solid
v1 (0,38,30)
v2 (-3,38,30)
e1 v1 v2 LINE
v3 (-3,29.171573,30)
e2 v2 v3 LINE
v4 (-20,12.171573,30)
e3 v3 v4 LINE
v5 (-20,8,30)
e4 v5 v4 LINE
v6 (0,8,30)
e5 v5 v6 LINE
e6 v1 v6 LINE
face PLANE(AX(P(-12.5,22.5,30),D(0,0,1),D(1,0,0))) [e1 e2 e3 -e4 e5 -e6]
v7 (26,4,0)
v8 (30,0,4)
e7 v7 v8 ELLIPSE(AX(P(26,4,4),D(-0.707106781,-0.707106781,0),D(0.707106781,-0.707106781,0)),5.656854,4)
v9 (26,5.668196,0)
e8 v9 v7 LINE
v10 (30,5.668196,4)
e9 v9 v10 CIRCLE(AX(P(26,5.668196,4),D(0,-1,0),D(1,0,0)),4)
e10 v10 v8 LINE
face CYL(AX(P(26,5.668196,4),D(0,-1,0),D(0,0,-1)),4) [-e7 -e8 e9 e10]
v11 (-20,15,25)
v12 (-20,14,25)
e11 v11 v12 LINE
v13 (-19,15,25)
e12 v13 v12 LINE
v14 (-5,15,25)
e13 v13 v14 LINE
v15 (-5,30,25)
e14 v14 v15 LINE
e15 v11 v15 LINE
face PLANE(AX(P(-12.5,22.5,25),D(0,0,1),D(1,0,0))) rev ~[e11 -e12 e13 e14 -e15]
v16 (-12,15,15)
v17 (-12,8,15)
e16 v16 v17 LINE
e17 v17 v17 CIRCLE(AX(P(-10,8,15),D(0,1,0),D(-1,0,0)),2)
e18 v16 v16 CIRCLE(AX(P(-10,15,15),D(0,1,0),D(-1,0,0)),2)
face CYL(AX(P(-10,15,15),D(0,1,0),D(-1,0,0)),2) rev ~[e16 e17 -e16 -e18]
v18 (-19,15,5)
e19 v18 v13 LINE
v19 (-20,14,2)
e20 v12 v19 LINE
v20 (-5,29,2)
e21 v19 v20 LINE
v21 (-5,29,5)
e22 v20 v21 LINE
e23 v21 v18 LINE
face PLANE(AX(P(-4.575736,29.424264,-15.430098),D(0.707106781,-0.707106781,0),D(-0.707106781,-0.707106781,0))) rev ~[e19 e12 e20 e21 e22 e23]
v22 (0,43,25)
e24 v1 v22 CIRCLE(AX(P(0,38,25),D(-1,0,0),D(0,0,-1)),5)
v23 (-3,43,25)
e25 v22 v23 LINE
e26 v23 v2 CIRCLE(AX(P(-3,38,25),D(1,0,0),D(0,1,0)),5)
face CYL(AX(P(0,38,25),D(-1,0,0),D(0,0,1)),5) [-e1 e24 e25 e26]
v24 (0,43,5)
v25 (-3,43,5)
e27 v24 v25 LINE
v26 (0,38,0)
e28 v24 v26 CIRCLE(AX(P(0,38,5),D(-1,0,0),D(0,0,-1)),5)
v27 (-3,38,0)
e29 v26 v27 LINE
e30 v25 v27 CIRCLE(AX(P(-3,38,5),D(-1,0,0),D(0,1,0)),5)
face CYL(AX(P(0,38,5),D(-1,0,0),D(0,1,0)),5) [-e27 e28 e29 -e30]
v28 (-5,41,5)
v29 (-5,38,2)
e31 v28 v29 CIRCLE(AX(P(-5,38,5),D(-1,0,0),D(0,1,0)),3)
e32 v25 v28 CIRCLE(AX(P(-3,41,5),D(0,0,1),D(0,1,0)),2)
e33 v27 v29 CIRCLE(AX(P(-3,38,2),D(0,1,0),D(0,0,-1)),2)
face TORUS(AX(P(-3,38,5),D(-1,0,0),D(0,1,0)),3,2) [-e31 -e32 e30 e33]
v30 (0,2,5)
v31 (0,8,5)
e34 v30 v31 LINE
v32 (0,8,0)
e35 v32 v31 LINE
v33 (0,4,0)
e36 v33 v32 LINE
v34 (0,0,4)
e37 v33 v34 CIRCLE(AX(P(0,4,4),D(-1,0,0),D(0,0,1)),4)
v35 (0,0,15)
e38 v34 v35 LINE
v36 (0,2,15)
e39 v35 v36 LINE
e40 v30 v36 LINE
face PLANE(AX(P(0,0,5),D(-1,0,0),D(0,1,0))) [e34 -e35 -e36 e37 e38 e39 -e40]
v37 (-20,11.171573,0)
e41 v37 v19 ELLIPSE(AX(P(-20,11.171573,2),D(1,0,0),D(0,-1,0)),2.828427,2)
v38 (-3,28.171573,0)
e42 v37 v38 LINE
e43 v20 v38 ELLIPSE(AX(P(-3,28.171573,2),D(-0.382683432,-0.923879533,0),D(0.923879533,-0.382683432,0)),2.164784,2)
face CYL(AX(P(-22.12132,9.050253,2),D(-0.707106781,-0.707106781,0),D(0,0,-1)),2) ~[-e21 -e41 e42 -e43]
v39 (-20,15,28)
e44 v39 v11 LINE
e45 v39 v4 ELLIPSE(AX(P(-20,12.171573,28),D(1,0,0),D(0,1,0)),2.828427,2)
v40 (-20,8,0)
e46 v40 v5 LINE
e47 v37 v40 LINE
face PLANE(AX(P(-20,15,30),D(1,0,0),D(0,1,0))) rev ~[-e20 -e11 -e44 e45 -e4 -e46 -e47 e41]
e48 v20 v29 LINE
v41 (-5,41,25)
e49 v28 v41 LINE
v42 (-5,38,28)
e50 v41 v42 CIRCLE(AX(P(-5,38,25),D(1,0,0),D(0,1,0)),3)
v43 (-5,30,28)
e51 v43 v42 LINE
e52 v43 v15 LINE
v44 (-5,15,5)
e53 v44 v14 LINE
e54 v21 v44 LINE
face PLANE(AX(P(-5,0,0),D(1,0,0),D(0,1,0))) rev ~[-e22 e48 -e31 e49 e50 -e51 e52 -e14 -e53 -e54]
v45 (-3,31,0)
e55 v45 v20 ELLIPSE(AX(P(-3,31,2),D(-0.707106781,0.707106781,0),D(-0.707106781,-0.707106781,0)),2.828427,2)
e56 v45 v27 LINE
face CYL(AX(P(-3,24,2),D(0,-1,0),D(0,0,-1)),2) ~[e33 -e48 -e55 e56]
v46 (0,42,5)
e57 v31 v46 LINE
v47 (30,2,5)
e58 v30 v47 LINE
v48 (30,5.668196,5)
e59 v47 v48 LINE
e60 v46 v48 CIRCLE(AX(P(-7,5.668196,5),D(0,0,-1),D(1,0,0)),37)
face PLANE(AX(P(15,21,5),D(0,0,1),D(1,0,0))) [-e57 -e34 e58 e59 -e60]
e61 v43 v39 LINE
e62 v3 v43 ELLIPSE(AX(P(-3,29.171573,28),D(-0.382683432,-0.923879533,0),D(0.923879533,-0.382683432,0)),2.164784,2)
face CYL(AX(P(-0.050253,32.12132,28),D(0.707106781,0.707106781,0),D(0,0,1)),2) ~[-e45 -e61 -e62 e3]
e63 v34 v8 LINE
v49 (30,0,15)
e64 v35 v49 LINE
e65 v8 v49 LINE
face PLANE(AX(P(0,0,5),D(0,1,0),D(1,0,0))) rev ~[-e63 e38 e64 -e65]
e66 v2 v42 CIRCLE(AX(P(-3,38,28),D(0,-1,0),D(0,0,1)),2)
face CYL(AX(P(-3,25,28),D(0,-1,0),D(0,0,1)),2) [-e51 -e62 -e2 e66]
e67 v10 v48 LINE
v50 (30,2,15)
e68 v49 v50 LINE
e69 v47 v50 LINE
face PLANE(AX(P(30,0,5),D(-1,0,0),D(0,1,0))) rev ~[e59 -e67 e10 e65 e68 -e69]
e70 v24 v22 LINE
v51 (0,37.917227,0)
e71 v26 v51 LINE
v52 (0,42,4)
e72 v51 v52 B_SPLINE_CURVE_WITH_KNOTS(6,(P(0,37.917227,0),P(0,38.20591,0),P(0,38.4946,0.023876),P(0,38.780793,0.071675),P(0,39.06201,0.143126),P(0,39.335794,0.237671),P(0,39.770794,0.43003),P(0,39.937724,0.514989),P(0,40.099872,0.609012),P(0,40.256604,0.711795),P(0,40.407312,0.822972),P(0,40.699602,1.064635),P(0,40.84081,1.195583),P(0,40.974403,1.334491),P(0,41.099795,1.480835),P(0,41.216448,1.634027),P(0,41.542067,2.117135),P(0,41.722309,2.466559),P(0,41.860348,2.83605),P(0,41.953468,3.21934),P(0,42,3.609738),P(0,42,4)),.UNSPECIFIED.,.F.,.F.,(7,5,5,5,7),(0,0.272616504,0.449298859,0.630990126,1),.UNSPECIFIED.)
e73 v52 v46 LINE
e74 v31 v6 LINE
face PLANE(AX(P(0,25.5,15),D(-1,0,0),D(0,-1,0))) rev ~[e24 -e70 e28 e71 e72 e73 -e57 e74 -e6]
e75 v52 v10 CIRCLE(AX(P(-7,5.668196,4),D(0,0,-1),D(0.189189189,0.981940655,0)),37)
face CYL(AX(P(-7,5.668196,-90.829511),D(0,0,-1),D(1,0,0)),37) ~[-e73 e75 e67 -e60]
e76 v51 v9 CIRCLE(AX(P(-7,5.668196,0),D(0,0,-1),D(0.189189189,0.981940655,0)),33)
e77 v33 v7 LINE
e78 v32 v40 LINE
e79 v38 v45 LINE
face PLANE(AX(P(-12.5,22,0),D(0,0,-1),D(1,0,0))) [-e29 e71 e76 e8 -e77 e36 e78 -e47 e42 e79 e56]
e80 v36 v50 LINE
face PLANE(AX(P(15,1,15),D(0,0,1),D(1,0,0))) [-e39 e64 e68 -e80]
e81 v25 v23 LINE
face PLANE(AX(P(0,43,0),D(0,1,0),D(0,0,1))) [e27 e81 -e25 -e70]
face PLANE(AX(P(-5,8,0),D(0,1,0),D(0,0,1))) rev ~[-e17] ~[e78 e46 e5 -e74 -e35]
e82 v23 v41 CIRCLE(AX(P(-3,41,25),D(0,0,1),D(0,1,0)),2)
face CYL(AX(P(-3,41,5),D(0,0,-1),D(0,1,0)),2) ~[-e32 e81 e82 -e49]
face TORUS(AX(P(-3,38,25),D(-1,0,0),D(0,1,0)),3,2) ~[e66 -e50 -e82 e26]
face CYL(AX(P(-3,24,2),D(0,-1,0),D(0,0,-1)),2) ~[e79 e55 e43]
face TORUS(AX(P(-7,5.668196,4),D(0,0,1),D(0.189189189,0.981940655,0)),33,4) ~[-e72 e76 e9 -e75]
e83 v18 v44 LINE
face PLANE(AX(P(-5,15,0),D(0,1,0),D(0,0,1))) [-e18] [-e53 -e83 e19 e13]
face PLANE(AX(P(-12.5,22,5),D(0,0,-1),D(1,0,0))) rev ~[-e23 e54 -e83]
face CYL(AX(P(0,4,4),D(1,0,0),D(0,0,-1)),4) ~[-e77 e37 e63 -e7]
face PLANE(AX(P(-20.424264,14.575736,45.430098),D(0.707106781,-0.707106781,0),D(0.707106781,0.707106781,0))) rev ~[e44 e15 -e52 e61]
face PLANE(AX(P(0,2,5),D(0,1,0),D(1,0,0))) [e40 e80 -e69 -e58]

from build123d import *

# Parameters (mm, degrees)
F0_W          = 30
F0_H          = 42
F1_DEPTH      = 5
F2_T1_DEPTH   = 186.6590212458
F3_W          = 30
F3_H          = 2
F4_DEPTH      = 10
F5_W          = 35
F5_H          = 30
F6_DEPTH      = 5
F7_W          = 7
F7_H          = 30
F8_DEPTH      = 15
F9_R          = 2
F10_DEPTH     = 10
F11_R         = 4
F12_W         = 15
F12_H         = 14
F13_DEPTH     = 5
F14_W         = 15
F14_H         = 15
F15_DEPTH     = 5
F16_T4_DEPTH  = 35.8601958556
F16_T9_DEPTH  = 35.8601958556
F17_R         = 5
F18_T1_DEPTH  = 20
F18_T6_DEPTH  = 9.5699020722
F18_T11_DEPTH = 31.2132034356
F18_T16_DEPTH = 31.2132034356
F18_T21_DEPTH = 14
F18_T24_ANGLE = 90
F18_T26_ANGLE = 90
F18_T30_DEPTH = 13
F18_T36_DEPTH = 14
F18_T40_DEPTH = 31.2132034356
F18_T47_DEPTH = 13
F18_T51_DEPTH = 31.2132034356


# Not quite as in the source:
# - a fillet or chamfer that OpenCascade refuses, or shapes differently, is made with other operations: its cross-section is extruded or revolved along the edge and cut away or added


with BuildPart() as f1:
    # F0 (on Top) → F1 (new body)
    with BuildSketch(Plane.XY):
        with Locations((15, 21)):
            Rectangle(F0_W, F0_H)
    extrude(amount=F1_DEPTH)

    # F2: fillet of radius 37 on 1 edges, made by hand

    # F2_s2 → F2_t1 (cut)
    with BuildSketch(Plane.XY.offset(-90.8295106229)):
        with BuildLine():
            ThreePointArc((30, 5.6681957508), (21.5306852354, 29.2266337296), (0, 42))
            Line((0, 42), (30, 42))
            Line((30, 42), (30, 5.6681957508))
        make_face()
    extrude(amount=F2_T1_DEPTH, mode=Mode.SUBTRACT)

    # F3 (on face) → F4 (join)
    with BuildSketch(Plane.XY.offset(5)):
        with Locations((15, 1)):
            Rectangle(F3_W, F3_H)
    extrude(amount=F4_DEPTH)

    # F5 (on face) → F6 (join)
    with BuildSketch(Plane(origin=(0, 0, 0), x_dir=(0, -1, 0), z_dir=(-1, 0, 0))):
        with Locations((-25.5, 15)):
            Rectangle(F5_W, F5_H)
    extrude(amount=F6_DEPTH)

    # F7 (on face) → F8 (join)
    with BuildSketch(Plane(origin=(-5, 0, 0), x_dir=(0, -1, 0), z_dir=(-1, 0, 0))):
        with Locations((-11.5, 15)):
            Rectangle(F7_W, F7_H)
    extrude(amount=F8_DEPTH)

    # F9 (on face) → F10 (cut)
    with BuildSketch(Plane(origin=(0, 15, 0), x_dir=(-1, 0, 0), z_dir=(0, 1, 0))):
        with Locations((10, 15)):
            Circle(F9_R)
    extrude(amount=-F10_DEPTH, mode=Mode.SUBTRACT)

    # F11
    f11_edges = [f1.edges().sort_by_distance(p)[0] for p in [
        (21.530685, 29.226634, 0),
        (15, 0, 0),
    ]]
    fillet(f11_edges, radius=F11_R)

    # F12 (on face) → F13 (join)
    with BuildSketch(Plane(origin=(0, 0, 0), x_dir=(1, 0, 0), z_dir=(0, 0, -1))):
        with Locations((-12.5, -22)):
            Rectangle(F12_W, F12_H)
    extrude(amount=-F13_DEPTH)

    # F14 (on face) → F15 (join)
    with BuildSketch(Plane.XY.offset(30)):
        with Locations((-12.5, 22.5)):
            Rectangle(F14_W, F14_H)
    extrude(amount=-F15_DEPTH)

    # F16: chamfer of 15 on 2 edges, made by hand


with BuildPart() as f16_tool2:
    # F16_s3 → F16_t4 (new body)
    with BuildSketch(Plane.XY.offset(45.4300979278)):
        with BuildLine():
            Line((-20.4242640687, 14.5757359313), (-4.5757359313, 30.4242640687))
            Line((-4.5757359313, 30.4242640687), (-4.5757359313, 30.7242640687))
            ThreePointArc((-4.5757359313, 30.7242640687), (-12.2878679656, 30.3), (-20, 30.3))
            Line((-20, 30.3), (-20.3, 30))
            ThreePointArc((-20.3, 30), (-20.3, 22.2878679656), (-20.7242640687, 14.5757359313))
            Line((-20.7242640687, 14.5757359313), (-20.4242640687, 14.5757359313))
        make_face()
    extrude(amount=-F16_T4_DEPTH)

    split(bisect_by=Plane.YZ.offset(-5), keep=Keep.BOTTOM)


with BuildPart() as f1_1:
    add(f1.part)

    # F16_t1: cut F16_tool2
    add(f16_tool2.part, mode=Mode.SUBTRACT)


with BuildPart() as f16_tool7:
    # F16_s8 → F16_t9 (new body)
    with BuildSketch(Plane.XY.offset(-15.4300979278)):
        with BuildLine():
            Line((-4.5757359313, 29.4242640687), (-20.4242640687, 13.5757359313))
            Line((-20.4242640687, 13.5757359313), (-20.7242640687, 13.5757359313))
            ThreePointArc((-20.7242640687, 13.5757359313), (-20.3, 21.2878679656), (-20.3, 29))
            Line((-20.3, 29), (-20, 29.3))
            ThreePointArc((-20, 29.3), (-12.2878679656, 29.3), (-4.5757359313, 29.7242640687))
            Line((-4.5757359313, 29.7242640687), (-4.5757359313, 29.4242640687))
        make_face()
    extrude(amount=F16_T9_DEPTH)

    split(bisect_by=Plane.YZ.offset(-5), keep=Keep.BOTTOM)


with BuildPart() as f1_2:
    add(f1_1.part)

    # F16_t6: cut F16_tool7
    add(f16_tool7.part, mode=Mode.SUBTRACT)

    # F17
    f17_edges = [f1_2.edges().sort_by_distance(p)[0] for p in [
        (-2.5, 43, 0),
        (-2.5, 43, 30),
    ]]
    fillet(f17_edges, radius=F17_R)

    # F18: fillet of radius 2 on 9 edges, made by hand

    # F18_s2 → F18_t1 (cut)
    with BuildSketch(Plane.XY.offset(5)):
        with BuildLine():
            ThreePointArc((-3, 43), (-4.4142135624, 42.4142135624), (-5, 41))
            Line((-5, 41), (-5, 43))
            Line((-5, 43), (-3, 43))
        make_face()
    extrude(amount=F18_T1_DEPTH, mode=Mode.SUBTRACT)


with BuildPart() as f18_tool4:
    # F18_s5 → F18_t6 (new body)
    with BuildSketch(Plane.XY.offset(25)):
        with BuildLine():
            ThreePointArc((-20, 13), (-19.4142135624, 14.4142135624), (-18, 15))
            Line((-18, 15), (-20, 15))
            Line((-20, 15), (-20, 13))
        make_face()
    extrude(amount=-F18_T6_DEPTH)

    split(bisect_by=Plane(origin=(-17, 17, 0), x_dir=(0, 0, 1), z_dir=(-0.7071067812, 0.7071067812, 0)), keep=Keep.TOP)


with BuildPart() as f1_3:
    add(f1_2.part)

    # F18_t3: cut F18_tool4
    add(f18_tool4.part, mode=Mode.SUBTRACT)


with BuildPart() as f18_tool9:
    # F18_s10 → F18_t11 (new body)
    with BuildSketch(Plane(origin=(-6.5355339059, -6.5355339059, 0), x_dir=(0, 0, 1), z_dir=(0.7071067812, 0.7071067812, 0))):
        with BuildLine():
            ThreePointArc((0, -22.0416305603), (0.5857864376, -23.4558441227), (2, -24.0416305603))
            Line((2, -24.0416305603), (0, -24.0416305603))
            Line((0, -24.0416305603), (0, -22.0416305603))
        make_face()
    extrude(amount=F18_T11_DEPTH)

    split(bisect_by=Plane.YZ.offset(-5), keep=Keep.BOTTOM)


with BuildPart() as f1_4:
    add(f1_3.part)

    # F18_t8: cut F18_tool9
    add(f18_tool9.part, mode=Mode.SUBTRACT)


with BuildPart() as f18_tool14:
    # F18_s15 → F18_t16 (new body)
    with BuildSketch(Plane(origin=(16.0355339059, 16.0355339059, 0), x_dir=(0, 0, 1), z_dir=(-0.7071067812, -0.7071067812, 0))):
        with BuildLine():
            ThreePointArc((30, 22.7487373415), (29.4142135624, 24.1629509039), (28, 24.7487373415))
            Line((28, 24.7487373415), (30, 24.7487373415))
            Line((30, 24.7487373415), (30, 22.7487373415))
        make_face()
    extrude(amount=F18_T16_DEPTH)

    split(bisect_by=Plane.YZ.offset(-5), keep=Keep.BOTTOM)


with BuildPart() as f1_5:
    add(f1_4.part)

    # F18_t13: cut F18_tool14
    add(f18_tool14.part, mode=Mode.SUBTRACT)


with BuildPart() as f18_tool19:
    # F18_s20 → F18_t21 (new body)
    with BuildSketch(Plane.XZ.offset(-24)):
        with BuildLine():
            ThreePointArc((-3, 0), (-4.4142135624, 0.5857864376), (-5, 2))
            Line((-5, 2), (-5, 0))
            Line((-5, 0), (-3, 0))
        make_face()
    extrude(amount=-F18_T21_DEPTH)

    split(bisect_by=Plane(origin=(-17, 17, 0), x_dir=(0, 0, 1), z_dir=(-0.7071067812, 0.7071067812, 0)), keep=Keep.TOP)


with BuildPart() as f1_6:
    add(f1_5.part)

    # F18_t18: cut F18_tool19
    add(f18_tool19.part, mode=Mode.SUBTRACT)

    # F18_s23 → F18_t24 (revolve, cut)
    with BuildSketch(Plane.XY.offset(5)):
        with BuildLine():
            ThreePointArc((-3, 43), (-4.4142135624, 42.4142135624), (-5, 41))
            Line((-5, 41), (-5, 43))
            Line((-5, 43), (-3, 43))
        make_face()
    revolve(axis=Axis((-5, 38, 5), (-1, 0, 0)), revolution_arc=F18_T24_ANGLE, mode=Mode.SUBTRACT)

    # F18_s25 → F18_t26 (revolve, cut)
    with BuildSketch(Plane.XY.offset(25)):
        with BuildLine():
            ThreePointArc((-3, 43), (-4.4142135624, 42.4142135624), (-5, 41))
            Line((-5, 41), (-5, 43))
            Line((-5, 43), (-3, 43))
        make_face()
    revolve(axis=Axis((-5, 38, 25), (1, 0, 0)), revolution_arc=F18_T26_ANGLE, mode=Mode.SUBTRACT)


with BuildPart() as f18_tool28:
    # F18_s29 → F18_t30 (new body)
    with BuildSketch(Plane.XZ.offset(-25)):
        with BuildLine():
            ThreePointArc((-3, 30), (-4.4142135624, 29.4142135624), (-5, 28))
            Line((-5, 28), (-5, 30))
            Line((-5, 30), (-3, 30))
        make_face()
    extrude(amount=-F18_T30_DEPTH)

    split(bisect_by=Plane(origin=(-17.5, 17.5, 0), x_dir=(0, 0, 1), z_dir=(-0.7071067812, 0.7071067812, 0)), keep=Keep.TOP)


with BuildPart() as f1_7:
    add(f1_6.part)

    # F18_t27: cut F18_tool28
    add(f18_tool28.part, mode=Mode.SUBTRACT)


with BuildPart() as f18_tool34:
    # F18_s35 → F18_t36 (new body)
    with BuildSketch(Plane.XZ.offset(-24)):
        with BuildLine():
            ThreePointArc((-3, 0), (-4.4142135624, 0.5857864376), (-5, 2))
            Line((-5, 2), (-5, 0))
            Line((-5, 0), (-3, 0))
        make_face()
    extrude(amount=-F18_T36_DEPTH)

    split(bisect_by=Plane(origin=(-17, 17, 0), x_dir=(0, 0, 1), z_dir=(0.7071067812, -0.7071067812, 0)), keep=Keep.TOP)


with BuildPart() as f18_tool38:
    # F18_s39 → F18_t40 (new body)
    with BuildSketch(Plane(origin=(-6.5355339059, -6.5355339059, 0), x_dir=(0, 0, 1), z_dir=(0.7071067812, 0.7071067812, 0))):
        with BuildLine():
            ThreePointArc((0, -22.0416305603), (0.5857864376, -23.4558441227), (2, -24.0416305603))
            Line((2, -24.0416305603), (0, -24.0416305603))
            Line((0, -24.0416305603), (0, -22.0416305603))
        make_face()
    extrude(amount=F18_T40_DEPTH)

    split(bisect_by=Plane.YZ.offset(-5), keep=Keep.TOP)


with BuildPart() as f18_tool34_1:
    add(f18_tool34.part)

    # F18_t42: intersect F18_tool38
    add(f18_tool38.part, mode=Mode.INTERSECT)


with BuildPart() as f1_8:
    add(f1_7.part)

    # F18_t32: cut F18_tool34
    add(f18_tool34_1.part, mode=Mode.SUBTRACT)


with BuildPart() as f18_tool45:
    # F18_s46 → F18_t47 (new body)
    with BuildSketch(Plane.XZ.offset(-25)):
        with BuildLine():
            ThreePointArc((-3, 30), (-4.4142135624, 29.4142135624), (-5, 28))
            Line((-5, 28), (-5, 30))
            Line((-5, 30), (-3, 30))
        make_face()
    extrude(amount=-F18_T47_DEPTH)

    split(bisect_by=Plane(origin=(-17.5, 17.5, 0), x_dir=(0, 0, 1), z_dir=(0.7071067812, -0.7071067812, 0)), keep=Keep.TOP)


with BuildPart() as f18_tool49:
    # F18_s50 → F18_t51 (new body)
    with BuildSketch(Plane(origin=(16.0355339059, 16.0355339059, 0), x_dir=(0, 0, 1), z_dir=(-0.7071067812, -0.7071067812, 0))):
        with BuildLine():
            ThreePointArc((30, 22.7487373415), (29.4142135624, 24.1629509039), (28, 24.7487373415))
            Line((28, 24.7487373415), (30, 24.7487373415))
            Line((30, 24.7487373415), (30, 22.7487373415))
        make_face()
    extrude(amount=F18_T51_DEPTH)

    split(bisect_by=Plane.YZ.offset(-5), keep=Keep.TOP)


with BuildPart() as f18_tool45_1:
    add(f18_tool45.part)

    # F18_t53: intersect F18_tool49
    add(f18_tool49.part, mode=Mode.INTERSECT)


with BuildPart() as f1_9:
    add(f1_8.part)

    # F18_t43: cut F18_tool45
    add(f18_tool45_1.part, mode=Mode.SUBTRACT)


solid = f1_9.part
